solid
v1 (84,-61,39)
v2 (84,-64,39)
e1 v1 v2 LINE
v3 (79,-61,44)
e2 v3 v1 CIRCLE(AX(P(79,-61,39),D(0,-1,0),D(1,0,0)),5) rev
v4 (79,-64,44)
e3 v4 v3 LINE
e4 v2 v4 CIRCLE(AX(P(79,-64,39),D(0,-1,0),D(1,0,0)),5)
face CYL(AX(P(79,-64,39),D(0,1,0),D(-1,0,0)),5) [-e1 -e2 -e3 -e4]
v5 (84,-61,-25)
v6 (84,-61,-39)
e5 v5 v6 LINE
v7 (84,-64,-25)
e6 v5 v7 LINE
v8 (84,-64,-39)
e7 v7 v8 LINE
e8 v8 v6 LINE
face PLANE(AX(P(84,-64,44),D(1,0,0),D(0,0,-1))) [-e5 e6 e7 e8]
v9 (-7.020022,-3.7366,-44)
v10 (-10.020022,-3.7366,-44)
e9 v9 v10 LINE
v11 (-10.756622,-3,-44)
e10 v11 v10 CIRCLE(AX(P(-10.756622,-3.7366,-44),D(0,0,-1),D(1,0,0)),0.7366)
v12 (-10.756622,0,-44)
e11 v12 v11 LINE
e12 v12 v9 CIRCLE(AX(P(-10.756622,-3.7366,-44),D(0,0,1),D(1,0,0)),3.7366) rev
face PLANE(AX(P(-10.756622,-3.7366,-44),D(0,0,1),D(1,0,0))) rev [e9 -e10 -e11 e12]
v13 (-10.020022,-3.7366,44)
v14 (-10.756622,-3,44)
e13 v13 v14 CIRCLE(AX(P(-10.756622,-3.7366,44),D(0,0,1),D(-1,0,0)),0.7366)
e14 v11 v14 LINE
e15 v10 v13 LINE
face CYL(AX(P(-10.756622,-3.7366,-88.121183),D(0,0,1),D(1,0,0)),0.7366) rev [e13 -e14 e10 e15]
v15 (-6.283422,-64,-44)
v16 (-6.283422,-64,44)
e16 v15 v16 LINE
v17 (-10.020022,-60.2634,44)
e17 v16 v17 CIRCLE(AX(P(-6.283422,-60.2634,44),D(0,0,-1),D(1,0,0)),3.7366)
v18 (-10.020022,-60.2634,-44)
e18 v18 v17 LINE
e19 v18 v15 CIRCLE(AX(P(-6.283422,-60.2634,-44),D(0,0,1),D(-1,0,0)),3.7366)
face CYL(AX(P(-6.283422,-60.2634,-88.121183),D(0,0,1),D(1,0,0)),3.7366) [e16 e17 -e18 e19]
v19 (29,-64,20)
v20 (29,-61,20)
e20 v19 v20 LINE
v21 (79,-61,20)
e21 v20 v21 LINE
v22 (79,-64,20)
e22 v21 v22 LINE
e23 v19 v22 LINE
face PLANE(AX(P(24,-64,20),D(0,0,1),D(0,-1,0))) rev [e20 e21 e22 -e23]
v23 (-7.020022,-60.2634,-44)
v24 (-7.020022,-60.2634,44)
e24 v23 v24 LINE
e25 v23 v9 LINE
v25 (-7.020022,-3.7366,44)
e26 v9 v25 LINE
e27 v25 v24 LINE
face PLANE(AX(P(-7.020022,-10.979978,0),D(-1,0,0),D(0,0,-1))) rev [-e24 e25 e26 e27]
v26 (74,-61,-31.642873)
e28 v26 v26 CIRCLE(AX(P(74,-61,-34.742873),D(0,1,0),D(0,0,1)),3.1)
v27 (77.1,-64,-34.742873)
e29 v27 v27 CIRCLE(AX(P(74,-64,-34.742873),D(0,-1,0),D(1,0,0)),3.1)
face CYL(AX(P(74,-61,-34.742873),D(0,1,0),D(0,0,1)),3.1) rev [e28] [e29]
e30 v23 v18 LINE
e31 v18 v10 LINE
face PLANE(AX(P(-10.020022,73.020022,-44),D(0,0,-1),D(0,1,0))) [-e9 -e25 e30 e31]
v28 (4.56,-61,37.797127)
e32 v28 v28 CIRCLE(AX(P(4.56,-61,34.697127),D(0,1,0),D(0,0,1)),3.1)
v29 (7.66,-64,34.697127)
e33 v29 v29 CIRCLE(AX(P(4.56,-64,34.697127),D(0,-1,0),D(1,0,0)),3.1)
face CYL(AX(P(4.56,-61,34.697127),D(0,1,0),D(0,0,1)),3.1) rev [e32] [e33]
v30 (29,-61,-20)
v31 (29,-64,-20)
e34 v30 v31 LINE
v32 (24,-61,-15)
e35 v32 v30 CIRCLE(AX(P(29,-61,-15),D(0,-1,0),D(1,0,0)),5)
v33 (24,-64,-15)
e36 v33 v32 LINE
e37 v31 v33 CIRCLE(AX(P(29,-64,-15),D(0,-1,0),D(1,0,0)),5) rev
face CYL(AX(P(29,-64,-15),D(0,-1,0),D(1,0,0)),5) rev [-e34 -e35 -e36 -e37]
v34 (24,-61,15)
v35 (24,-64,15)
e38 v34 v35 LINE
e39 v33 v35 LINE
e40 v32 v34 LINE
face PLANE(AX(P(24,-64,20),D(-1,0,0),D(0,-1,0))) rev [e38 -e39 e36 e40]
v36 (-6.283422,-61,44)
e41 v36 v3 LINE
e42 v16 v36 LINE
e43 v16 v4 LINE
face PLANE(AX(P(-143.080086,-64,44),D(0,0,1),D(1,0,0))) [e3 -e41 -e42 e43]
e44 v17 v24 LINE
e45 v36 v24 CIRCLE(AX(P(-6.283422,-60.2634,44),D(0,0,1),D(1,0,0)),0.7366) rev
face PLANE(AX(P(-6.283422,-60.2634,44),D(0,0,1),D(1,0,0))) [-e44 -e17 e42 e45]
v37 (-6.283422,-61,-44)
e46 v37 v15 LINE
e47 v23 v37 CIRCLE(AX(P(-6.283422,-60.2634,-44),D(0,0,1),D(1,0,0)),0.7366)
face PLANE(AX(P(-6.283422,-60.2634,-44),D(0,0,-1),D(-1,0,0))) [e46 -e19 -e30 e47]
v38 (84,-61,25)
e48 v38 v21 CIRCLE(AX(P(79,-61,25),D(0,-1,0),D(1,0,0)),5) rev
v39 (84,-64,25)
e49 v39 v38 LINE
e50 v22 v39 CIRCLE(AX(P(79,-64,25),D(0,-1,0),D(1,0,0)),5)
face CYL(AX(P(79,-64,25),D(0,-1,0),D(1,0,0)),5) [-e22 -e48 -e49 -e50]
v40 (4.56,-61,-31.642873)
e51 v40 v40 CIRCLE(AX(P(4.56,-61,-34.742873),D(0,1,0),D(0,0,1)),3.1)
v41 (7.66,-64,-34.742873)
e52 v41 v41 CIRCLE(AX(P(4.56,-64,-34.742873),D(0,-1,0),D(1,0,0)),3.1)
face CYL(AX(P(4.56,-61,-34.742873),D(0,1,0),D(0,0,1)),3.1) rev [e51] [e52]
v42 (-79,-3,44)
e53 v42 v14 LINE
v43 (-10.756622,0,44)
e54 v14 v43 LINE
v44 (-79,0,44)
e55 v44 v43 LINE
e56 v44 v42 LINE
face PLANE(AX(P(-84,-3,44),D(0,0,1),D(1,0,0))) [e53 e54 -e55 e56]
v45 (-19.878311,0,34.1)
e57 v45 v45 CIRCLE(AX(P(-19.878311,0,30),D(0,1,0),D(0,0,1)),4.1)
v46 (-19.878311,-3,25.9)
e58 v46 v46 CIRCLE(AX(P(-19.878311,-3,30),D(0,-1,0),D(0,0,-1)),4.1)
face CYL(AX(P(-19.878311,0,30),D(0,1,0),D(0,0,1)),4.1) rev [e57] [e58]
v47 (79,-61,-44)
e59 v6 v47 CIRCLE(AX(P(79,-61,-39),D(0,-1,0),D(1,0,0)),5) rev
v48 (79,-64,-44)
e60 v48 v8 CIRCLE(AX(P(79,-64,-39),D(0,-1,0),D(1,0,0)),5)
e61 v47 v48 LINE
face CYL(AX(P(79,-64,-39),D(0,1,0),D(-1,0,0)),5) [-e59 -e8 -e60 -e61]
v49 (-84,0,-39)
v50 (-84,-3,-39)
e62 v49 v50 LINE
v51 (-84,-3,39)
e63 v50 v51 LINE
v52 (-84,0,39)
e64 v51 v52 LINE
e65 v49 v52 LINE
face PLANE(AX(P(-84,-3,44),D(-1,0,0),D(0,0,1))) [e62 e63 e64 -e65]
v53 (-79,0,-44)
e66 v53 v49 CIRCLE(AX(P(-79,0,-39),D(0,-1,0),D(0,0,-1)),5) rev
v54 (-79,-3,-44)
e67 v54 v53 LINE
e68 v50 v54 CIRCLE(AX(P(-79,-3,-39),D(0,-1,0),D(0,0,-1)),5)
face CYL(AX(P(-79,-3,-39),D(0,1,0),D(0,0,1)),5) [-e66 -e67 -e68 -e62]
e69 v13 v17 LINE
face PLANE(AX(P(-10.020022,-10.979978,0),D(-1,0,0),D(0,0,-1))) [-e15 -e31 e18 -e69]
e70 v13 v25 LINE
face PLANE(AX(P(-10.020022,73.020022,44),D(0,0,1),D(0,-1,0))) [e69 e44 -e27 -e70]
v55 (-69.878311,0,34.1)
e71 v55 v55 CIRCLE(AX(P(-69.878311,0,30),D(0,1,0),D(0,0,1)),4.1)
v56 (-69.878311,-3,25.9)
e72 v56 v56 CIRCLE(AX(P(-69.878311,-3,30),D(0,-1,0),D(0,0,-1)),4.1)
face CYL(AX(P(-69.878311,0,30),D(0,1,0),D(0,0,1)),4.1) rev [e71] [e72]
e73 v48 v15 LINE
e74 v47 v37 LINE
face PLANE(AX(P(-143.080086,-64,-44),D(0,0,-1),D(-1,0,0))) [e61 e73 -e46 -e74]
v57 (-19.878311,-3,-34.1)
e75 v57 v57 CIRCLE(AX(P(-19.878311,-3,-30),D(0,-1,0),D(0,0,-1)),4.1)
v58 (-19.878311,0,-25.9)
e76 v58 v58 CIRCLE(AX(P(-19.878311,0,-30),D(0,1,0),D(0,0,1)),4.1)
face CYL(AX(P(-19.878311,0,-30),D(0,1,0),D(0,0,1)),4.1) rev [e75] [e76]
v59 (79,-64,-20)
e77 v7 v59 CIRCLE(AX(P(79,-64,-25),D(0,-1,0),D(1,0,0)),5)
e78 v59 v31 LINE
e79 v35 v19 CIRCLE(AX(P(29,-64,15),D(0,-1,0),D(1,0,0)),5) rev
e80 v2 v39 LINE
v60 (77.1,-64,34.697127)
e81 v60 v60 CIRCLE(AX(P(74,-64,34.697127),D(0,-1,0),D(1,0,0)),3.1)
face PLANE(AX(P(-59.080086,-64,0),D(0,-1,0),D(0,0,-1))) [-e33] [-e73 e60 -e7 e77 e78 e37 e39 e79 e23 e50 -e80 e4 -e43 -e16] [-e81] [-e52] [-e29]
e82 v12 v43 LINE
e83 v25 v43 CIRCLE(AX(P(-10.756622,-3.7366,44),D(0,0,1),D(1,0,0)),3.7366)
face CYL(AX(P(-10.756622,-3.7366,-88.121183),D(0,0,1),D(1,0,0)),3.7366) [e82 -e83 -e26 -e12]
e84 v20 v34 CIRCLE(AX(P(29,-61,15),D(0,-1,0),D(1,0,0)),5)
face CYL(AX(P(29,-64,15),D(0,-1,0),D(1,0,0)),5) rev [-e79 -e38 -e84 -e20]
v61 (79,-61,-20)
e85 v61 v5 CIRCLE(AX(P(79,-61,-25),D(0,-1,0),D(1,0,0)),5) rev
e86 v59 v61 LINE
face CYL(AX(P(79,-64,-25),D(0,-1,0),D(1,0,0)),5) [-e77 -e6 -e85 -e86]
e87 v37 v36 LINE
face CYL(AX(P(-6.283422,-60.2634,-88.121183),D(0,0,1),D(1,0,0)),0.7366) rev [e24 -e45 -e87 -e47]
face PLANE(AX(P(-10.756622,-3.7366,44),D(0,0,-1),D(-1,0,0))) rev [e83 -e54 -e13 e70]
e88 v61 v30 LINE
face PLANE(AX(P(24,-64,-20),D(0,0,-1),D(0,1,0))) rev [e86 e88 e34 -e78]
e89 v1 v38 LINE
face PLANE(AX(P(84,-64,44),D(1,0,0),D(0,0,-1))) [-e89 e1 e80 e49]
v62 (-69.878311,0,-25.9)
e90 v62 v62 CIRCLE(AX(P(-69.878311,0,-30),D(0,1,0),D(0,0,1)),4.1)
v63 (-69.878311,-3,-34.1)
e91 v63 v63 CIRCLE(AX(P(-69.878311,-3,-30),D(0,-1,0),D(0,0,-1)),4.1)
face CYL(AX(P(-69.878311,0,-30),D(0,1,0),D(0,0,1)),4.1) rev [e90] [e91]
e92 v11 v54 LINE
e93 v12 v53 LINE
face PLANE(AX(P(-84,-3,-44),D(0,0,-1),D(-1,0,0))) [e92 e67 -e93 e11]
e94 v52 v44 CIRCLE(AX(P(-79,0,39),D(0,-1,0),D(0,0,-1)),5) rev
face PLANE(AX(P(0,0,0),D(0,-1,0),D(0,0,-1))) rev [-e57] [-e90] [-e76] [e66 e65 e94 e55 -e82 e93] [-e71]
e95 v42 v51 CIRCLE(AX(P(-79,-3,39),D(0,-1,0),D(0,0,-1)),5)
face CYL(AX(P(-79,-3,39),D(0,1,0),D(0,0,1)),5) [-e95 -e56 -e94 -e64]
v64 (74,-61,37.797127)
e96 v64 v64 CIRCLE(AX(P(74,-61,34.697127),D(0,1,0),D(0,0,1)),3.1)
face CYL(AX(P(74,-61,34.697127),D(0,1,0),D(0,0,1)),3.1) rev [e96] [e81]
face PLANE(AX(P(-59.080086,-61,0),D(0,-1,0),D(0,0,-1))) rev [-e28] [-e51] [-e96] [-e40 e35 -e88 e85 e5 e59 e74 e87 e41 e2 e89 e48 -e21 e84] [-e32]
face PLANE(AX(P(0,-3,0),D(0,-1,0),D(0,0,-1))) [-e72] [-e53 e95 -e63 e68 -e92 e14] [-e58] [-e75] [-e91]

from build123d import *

# Parameters (mm, degrees)
SZKIC1_W                       = 168
SZKIC1_H                       = 88
ODGI_CIE_BAZOWE1_DEPTH         = 3
USKOK1_START                   = -44
USKOK1_DEPTH                   = 88
USKOK1_2_DEPTH                 = 88
SZKIC7_W                       = 60
SZKIC7_H                       = 40
WYTNIJ_WYCI_GNI_CIE1_DEPTH     = 113.751940116
ZAOKR_GLENIE1_R                = 5
OTWORY_USTALAJ_CE_6_2MM1_D     = 6.2
OTWORY_USTALAJ_CE_6_2MM1_DEPTH = 27.5
OTWORY_USTALAJ_CE_6_2MM1_TIP   = 1.862667919
OTWORY_USTALAJ_CE_8_0MM2_D     = 8.2
OTWORY_USTALAJ_CE_8_0MM2_DEPTH = 27.5
OTWORY_USTALAJ_CE_8_0MM2_TIP   = 2.463528538


# Read off the part's stored shape, not the designer's step: Uskok1
# Sheet-metal steps are written as plain solids
with BuildPart() as part:
    # Szkic1 → Odgięcie bazowe1 (new body)
    with BuildSketch(Plane(origin=(0, 0, 0), x_dir=(1, 0, 0), z_dir=(0, 1, 0))):
        Rectangle(SZKIC1_W, SZKIC1_H)
    extrude(amount=-ODGI_CIE_BAZOWE1_DEPTH)

    # Uskok1 outline → Uskok1 (cut)
    with BuildSketch(Plane.XY.offset(USKOK1_START)):
        with BuildLine():
            ThreePointArc((-10.756621532, 0), (-8.389154531, -0.845704021), (-7.093344311, -3))
            Line((-7.093344311, -3), (84, -3))
            Line((84, -3), (84, 0))
            Line((84, 0), (-10.756621532, 0))
        make_face()
    extrude(amount=USKOK1_DEPTH, mode=Mode.SUBTRACT)

    # Uskok1 2 outline → Uskok1 2 (add)
    with BuildSketch(Plane.XY.offset(USKOK1_START)):
        with BuildLine():
            ThreePointArc((-10.756621532, -3), (-10.235766677, -3.215745145), (-10.020021532, -3.7366))
            Line((-10.020021532, -3.7366), (-10.020021532, -60.2634))
            ThreePointArc((-10.020021532, -60.2634), (-8.925596731, -62.905575199), (-6.283421532, -64))
            Line((-6.283421532, -64), (84, -64))
            Line((84, -64), (84, -61))
            Line((84, -61), (-6.283421532, -61))
            ThreePointArc((-6.283421532, -61), (-6.804276387, -60.784254855), (-7.020021532, -60.2634))
            Line((-7.020021532, -60.2634), (-7.020021532, -3.7366))
            ThreePointArc((-7.020021532, -3.7366), (-7.038397411, -3.36647982), (-7.093344311, -3))
            Line((-7.093344311, -3), (-10.756621532, -3))
        make_face()
    extrude(amount=USKOK1_2_DEPTH)

    # Szkic7 → Wytnij-wyciągnięcie1 (cut, through all)
    with BuildSketch(Plane(origin=(0, -61, 0), x_dir=(1, 0, 0), z_dir=(0, 1, 0))):
        with Locations((54, 0)):
            Rectangle(SZKIC7_W, SZKIC7_H)
    extrude(amount=-WYTNIJ_WYCI_GNI_CIE1_DEPTH, mode=Mode.SUBTRACT)

    # Zaokrąglenie1
    zaokr_glenie1_edges = [part.edges().sort_by_distance(p)[0] for p in [
        (84, -62.5, -44),
        (84, -62.5, 44),
        (84, -62.5, -20),
        (84, -62.5, 20),
        (24, -62.5, 20),
        (24, -62.5, -20),
        (-84, -1.5, 44),
        (-84, -1.5, -44),
    ]]
    fillet(zaokr_glenie1_edges, radius=ZAOKR_GLENIE1_R)

    # Otwory ustalające Ø6.2mm1
    with Locations(Plane(origin=(0, -61, 0), x_dir=(1, 0, 0), z_dir=(0, 1, 0))):
        with Locations((74, 34.742873432), (74, -34.697126568), (4.56, -34.697126568), (4.56, 34.742873432)):
            Hole(OTWORY_USTALAJ_CE_6_2MM1_D / 2, depth=OTWORY_USTALAJ_CE_6_2MM1_DEPTH)
            with Locations((0, 0, -(OTWORY_USTALAJ_CE_6_2MM1_DEPTH + OTWORY_USTALAJ_CE_6_2MM1_TIP / 2))):  # 118° drill point
                Cone(0, OTWORY_USTALAJ_CE_6_2MM1_D / 2, OTWORY_USTALAJ_CE_6_2MM1_TIP, mode=Mode.SUBTRACT)

    # Otwory ustalające Ø8.0mm2
    with Locations(Plane(origin=(0, 0, 0), x_dir=(1, 0, 0), z_dir=(0, 1, 0))):
        with Locations((-69.878310766, 30), (-19.878310766, 30), (-19.878310766, -30), (-69.878310766, -30)):
            Hole(OTWORY_USTALAJ_CE_8_0MM2_D / 2, depth=OTWORY_USTALAJ_CE_8_0MM2_DEPTH)
            with Locations((0, 0, -(OTWORY_USTALAJ_CE_8_0MM2_DEPTH + OTWORY_USTALAJ_CE_8_0MM2_TIP / 2))):  # 118° drill point
                Cone(0, OTWORY_USTALAJ_CE_8_0MM2_D / 2, OTWORY_USTALAJ_CE_8_0MM2_TIP, mode=Mode.SUBTRACT)


solid = part.part
